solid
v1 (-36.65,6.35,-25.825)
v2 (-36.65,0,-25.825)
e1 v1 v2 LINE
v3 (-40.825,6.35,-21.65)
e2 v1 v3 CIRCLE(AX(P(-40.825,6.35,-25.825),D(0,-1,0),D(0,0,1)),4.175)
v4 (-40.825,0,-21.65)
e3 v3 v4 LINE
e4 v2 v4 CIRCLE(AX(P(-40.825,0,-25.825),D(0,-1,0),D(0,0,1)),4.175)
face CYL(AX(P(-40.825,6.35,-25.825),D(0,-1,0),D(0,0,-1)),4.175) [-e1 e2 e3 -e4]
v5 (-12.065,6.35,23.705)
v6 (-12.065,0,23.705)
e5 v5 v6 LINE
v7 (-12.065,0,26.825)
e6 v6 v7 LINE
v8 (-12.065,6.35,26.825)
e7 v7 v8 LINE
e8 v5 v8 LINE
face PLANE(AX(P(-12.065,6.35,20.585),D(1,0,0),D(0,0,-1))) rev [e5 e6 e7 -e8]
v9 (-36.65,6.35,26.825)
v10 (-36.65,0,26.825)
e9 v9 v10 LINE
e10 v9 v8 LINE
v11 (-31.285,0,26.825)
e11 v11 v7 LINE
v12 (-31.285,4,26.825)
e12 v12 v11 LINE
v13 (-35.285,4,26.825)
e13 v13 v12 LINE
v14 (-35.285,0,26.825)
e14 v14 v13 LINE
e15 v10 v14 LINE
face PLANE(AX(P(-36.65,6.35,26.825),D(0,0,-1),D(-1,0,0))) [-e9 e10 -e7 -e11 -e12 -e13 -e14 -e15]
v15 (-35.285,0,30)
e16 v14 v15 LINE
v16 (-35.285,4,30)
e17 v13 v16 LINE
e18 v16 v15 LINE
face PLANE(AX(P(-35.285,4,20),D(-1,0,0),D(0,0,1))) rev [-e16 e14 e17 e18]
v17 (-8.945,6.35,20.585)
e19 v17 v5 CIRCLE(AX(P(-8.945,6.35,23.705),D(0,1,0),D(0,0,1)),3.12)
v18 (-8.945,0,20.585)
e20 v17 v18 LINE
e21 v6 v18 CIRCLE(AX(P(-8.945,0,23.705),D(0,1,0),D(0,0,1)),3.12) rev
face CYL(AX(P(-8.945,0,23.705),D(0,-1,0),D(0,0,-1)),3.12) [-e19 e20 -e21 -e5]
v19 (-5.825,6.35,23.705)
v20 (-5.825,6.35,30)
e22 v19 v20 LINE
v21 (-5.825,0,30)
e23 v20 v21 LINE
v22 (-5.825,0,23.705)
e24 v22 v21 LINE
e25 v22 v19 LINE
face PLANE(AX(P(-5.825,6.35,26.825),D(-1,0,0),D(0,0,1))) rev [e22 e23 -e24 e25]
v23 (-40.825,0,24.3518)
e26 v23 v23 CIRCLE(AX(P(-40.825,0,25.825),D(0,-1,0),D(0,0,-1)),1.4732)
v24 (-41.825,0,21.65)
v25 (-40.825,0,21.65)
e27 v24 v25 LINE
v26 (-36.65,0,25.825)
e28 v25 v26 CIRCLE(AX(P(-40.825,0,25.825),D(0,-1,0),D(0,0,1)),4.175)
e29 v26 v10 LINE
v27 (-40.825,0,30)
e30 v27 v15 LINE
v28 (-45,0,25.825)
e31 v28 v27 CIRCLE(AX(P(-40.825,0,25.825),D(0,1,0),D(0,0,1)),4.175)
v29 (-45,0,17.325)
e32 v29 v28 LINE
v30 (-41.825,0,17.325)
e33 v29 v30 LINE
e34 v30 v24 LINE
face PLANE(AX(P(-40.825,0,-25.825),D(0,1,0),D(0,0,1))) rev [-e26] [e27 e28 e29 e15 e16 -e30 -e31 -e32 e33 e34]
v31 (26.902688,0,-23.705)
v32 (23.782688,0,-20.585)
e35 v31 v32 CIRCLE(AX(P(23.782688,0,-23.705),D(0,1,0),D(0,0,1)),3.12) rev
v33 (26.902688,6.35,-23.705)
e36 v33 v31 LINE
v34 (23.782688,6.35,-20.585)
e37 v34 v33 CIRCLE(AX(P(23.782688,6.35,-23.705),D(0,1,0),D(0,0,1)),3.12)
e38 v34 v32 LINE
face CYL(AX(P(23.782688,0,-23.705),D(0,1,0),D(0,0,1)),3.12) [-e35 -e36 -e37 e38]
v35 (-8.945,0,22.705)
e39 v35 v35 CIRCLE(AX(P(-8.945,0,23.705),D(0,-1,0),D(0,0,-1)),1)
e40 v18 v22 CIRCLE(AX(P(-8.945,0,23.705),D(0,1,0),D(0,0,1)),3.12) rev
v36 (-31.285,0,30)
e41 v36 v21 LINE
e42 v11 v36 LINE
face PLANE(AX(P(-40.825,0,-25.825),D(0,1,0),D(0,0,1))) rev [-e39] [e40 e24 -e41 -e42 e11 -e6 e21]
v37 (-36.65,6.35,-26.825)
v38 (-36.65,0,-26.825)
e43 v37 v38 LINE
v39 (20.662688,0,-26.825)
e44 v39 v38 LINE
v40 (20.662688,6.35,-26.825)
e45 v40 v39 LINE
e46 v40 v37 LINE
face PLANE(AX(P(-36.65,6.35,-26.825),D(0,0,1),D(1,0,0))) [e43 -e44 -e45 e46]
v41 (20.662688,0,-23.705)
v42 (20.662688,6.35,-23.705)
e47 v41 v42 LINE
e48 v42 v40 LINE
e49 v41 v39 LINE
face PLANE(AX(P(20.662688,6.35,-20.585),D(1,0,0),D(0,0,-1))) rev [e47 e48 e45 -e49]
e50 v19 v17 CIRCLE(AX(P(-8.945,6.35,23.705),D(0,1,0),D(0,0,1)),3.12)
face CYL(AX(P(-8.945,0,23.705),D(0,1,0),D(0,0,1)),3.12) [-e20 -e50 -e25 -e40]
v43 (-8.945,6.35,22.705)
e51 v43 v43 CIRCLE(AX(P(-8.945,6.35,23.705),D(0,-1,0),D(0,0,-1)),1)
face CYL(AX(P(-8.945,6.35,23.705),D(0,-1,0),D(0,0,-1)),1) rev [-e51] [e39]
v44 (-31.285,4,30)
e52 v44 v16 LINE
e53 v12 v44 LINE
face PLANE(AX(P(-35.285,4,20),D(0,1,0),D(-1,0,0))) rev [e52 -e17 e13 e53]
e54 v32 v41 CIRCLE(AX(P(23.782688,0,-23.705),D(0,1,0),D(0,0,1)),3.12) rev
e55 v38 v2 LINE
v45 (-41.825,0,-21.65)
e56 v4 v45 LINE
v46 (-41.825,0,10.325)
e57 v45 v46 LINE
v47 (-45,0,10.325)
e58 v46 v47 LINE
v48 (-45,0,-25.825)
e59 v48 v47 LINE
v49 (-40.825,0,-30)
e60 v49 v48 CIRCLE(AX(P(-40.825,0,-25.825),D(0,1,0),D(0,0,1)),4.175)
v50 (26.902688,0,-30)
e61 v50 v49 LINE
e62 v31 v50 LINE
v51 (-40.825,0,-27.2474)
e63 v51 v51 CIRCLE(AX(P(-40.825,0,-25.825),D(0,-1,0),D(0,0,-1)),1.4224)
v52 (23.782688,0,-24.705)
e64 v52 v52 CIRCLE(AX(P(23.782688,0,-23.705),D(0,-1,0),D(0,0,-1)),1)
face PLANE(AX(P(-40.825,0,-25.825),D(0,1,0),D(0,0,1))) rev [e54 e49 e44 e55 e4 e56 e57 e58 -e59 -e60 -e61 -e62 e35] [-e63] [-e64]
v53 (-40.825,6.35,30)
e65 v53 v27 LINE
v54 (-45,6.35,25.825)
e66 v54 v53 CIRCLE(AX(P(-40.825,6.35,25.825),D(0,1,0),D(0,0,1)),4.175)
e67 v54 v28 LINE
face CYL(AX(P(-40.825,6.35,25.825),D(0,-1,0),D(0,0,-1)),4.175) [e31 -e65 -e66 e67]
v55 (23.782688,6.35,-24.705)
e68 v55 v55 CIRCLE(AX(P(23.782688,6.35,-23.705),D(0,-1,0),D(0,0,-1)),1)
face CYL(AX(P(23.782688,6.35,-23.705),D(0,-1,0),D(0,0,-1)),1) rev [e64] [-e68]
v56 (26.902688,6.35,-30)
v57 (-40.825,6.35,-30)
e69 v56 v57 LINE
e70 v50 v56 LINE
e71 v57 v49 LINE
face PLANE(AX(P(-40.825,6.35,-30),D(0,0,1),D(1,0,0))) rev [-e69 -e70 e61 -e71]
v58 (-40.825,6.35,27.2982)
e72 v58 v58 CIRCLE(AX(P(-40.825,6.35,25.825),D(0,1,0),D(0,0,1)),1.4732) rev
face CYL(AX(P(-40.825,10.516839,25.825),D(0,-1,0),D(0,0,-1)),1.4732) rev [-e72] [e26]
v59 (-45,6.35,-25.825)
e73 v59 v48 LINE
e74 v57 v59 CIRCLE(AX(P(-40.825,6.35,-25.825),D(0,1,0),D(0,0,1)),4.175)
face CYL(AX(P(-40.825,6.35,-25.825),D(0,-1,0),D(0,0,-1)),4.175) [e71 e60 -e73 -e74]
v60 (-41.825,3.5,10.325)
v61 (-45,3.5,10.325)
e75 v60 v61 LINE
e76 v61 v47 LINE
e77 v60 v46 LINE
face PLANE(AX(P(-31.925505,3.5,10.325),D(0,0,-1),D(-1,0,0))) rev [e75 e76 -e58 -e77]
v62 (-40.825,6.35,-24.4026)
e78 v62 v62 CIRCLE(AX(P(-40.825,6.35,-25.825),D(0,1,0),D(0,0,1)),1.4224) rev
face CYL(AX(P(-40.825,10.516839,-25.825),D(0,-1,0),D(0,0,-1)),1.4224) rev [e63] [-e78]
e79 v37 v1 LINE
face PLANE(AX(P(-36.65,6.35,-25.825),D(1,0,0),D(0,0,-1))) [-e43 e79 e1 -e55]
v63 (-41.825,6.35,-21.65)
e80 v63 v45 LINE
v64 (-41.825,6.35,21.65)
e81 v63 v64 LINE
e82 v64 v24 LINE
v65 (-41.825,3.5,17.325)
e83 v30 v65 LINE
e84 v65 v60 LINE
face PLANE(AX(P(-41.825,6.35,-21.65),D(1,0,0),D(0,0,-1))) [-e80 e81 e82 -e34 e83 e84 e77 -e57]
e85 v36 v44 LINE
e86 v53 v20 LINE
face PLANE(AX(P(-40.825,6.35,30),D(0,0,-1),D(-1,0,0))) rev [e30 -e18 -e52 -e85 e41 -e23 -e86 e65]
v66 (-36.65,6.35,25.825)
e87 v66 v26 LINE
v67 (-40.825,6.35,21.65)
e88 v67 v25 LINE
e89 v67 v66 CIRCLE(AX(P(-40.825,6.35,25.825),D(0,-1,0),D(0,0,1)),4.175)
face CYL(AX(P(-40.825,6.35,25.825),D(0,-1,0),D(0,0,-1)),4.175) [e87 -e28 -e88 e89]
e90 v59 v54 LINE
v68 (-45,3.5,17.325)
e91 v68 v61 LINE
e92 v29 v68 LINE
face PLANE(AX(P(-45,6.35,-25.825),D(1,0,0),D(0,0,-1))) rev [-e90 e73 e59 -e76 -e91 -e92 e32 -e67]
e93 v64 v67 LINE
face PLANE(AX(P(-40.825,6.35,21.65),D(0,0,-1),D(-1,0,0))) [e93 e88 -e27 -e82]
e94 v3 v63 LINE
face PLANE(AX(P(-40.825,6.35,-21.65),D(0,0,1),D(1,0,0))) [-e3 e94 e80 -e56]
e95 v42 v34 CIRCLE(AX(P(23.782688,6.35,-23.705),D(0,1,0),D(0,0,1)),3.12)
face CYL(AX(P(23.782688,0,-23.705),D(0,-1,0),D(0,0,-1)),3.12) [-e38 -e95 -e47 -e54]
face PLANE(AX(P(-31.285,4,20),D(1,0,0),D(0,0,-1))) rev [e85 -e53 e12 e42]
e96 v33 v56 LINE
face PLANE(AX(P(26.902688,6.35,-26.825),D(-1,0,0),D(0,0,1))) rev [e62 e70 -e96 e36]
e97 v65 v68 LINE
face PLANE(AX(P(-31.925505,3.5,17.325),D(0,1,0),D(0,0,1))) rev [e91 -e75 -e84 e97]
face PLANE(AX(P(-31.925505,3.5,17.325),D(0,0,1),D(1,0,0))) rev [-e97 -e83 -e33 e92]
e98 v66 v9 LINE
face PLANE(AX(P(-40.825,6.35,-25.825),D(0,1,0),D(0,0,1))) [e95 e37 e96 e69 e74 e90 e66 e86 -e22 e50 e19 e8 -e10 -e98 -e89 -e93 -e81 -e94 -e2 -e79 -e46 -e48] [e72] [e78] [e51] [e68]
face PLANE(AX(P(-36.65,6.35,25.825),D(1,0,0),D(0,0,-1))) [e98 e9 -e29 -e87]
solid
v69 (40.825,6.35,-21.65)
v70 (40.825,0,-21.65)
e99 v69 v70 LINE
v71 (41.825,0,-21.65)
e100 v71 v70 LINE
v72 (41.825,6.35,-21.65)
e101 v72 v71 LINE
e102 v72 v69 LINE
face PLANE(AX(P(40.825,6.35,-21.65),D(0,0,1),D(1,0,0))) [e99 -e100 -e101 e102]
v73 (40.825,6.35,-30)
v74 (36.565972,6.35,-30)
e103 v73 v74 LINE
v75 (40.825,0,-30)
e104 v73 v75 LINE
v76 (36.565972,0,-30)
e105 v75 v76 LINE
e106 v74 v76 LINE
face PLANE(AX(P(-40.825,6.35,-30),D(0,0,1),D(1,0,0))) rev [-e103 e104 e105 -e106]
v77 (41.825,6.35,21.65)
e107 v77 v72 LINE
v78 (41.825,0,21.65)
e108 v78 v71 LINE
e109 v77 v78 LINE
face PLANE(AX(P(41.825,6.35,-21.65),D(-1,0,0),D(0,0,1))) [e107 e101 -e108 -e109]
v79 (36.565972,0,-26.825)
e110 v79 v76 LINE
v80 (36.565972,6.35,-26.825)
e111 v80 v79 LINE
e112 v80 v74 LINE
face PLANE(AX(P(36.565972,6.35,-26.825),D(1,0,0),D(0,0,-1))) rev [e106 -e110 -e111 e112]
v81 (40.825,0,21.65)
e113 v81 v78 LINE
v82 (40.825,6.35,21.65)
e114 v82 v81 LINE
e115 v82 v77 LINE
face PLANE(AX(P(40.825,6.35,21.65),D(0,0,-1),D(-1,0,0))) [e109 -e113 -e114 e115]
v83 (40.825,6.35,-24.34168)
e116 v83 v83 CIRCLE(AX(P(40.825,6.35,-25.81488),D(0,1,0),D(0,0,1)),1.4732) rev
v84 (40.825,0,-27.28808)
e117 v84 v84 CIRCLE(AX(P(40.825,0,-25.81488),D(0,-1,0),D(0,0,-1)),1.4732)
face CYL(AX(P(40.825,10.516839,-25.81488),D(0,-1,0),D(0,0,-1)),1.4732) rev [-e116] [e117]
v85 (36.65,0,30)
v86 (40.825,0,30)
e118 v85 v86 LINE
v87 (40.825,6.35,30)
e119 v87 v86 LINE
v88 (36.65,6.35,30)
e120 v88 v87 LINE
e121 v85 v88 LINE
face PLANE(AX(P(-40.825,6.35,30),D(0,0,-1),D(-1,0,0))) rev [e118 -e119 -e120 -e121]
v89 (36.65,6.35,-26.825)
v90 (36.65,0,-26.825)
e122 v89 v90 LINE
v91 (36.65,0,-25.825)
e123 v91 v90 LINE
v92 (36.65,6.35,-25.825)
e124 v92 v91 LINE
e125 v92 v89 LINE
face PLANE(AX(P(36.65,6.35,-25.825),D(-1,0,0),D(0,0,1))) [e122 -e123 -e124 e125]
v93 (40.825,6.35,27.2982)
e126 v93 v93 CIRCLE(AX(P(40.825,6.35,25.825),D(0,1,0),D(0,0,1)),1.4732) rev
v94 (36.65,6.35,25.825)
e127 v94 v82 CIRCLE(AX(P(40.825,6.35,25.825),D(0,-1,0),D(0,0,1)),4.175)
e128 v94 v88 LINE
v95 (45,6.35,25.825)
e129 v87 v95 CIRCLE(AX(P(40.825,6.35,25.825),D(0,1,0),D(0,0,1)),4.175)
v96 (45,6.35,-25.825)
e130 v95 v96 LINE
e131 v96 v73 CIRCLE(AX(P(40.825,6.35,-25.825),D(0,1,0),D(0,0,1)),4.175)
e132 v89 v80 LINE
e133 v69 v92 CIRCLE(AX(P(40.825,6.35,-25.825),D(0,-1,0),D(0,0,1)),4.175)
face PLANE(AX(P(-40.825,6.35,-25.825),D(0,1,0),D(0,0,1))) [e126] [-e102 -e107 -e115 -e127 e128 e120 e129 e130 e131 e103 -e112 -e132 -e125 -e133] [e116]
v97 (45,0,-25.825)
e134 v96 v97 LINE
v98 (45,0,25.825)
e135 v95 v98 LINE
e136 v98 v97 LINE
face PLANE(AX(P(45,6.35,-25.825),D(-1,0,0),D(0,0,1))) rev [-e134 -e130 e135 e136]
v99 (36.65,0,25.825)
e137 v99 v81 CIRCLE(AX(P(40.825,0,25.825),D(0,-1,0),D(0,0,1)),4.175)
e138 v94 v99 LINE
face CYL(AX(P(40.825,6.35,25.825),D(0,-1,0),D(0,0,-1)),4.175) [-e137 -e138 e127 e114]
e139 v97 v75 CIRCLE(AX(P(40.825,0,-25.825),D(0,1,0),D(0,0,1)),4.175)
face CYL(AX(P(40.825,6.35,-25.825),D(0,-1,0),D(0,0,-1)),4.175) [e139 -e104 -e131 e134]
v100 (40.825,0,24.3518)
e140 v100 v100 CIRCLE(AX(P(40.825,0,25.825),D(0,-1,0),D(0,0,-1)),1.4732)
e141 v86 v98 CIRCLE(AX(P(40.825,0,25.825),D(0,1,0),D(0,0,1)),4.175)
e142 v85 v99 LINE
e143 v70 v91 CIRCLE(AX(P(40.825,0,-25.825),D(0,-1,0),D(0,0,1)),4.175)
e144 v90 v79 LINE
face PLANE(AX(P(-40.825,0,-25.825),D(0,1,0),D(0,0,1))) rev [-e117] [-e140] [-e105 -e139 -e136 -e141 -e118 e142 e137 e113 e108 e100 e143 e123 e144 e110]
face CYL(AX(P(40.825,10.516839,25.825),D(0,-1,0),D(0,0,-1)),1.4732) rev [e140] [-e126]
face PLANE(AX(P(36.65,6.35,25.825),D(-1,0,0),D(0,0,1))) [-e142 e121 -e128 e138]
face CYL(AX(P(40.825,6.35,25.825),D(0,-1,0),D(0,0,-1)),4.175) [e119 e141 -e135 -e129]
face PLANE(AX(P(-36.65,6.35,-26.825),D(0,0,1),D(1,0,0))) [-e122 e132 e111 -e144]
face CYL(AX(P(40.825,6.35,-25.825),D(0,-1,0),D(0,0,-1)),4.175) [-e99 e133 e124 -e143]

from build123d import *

# Parameters (mm, degrees)
BOSS_EXTRUDE3_DEPTH = 6.35
SKETCH3_W           = 9.663283239
SKETCH3_H           = 6.35
CUT_EXTRUDE1_DEPTH  = 3.175
SKETCH4_W           = 42.475
SKETCH4_H           = 6.35
CUT_EXTRUDE2_DEPTH  = 8.35
SKETCH5_W           = 7
SKETCH5_H           = 7
CUT_EXTRUDE3_DEPTH  = 3.175
SKETCH6_R           = 1.4732
CUT_EXTRUDE4_DEPTH  = 6.35
SKETCH7_R           = 1.4224
SKETCH7_R_2         = 1.4732
CUT_EXTRUDE5_DEPTH  = 6.35
SKETCH8_W           = 6.24
SKETCH8_H           = 6.35
BOSS_EXTRUDE4_DEPTH = 6.24
SKETCH9_W           = 6.24
SKETCH9_H           = 6.35
BOSS_EXTRUDE5_DEPTH = 6.24
SKETCH10_R          = 1
CUT_EXTRUDE6_DEPTH  = 55.454774814
FILLET1_R           = 3.12
SKETCH11_W          = 4
SKETCH11_H          = 4
CUT_EXTRUDE7_DEPTH  = 10


with BuildPart() as part:
    # Sketch2 → Boss-Extrude3 (new body)
    with BuildSketch(Plane(origin=(0, 0, 0), x_dir=(1, 0, 0), z_dir=(0, 1, 0))):
        with BuildLine():
            Line((-45, 25.825), (-45, -25.825))
            ThreePointArc((-45, -25.825), (-43.777170811, -28.777170811), (-40.825, -30))
            Line((-40.825, -30), (40.825, -30))
            ThreePointArc((40.825, -30), (43.777170811, -28.777170811), (45, -25.825))
            Line((45, -25.825), (45, 25.825))
            ThreePointArc((45, 25.825), (43.777170811, 28.777170811), (40.825, 30))
            Line((40.825, 30), (-40.825, 30))
            ThreePointArc((-40.825, 30), (-43.777170811, 28.777170811), (-45, 25.825))
        make_face()
        with BuildLine():
            Line((40.825, 21.65), (41.825, 21.65))
            Line((41.825, 21.65), (41.825, -21.65))
            Line((41.825, -21.65), (40.825, -21.65))
            ThreePointArc((40.825, -21.65), (37.872829189, -22.872829189), (36.65, -25.825))
            Line((36.65, -25.825), (36.65, -26.825))
            Line((36.65, -26.825), (-36.65, -26.825))
            Line((-36.65, -26.825), (-36.65, -25.825))
            ThreePointArc((-36.65, -25.825), (-37.872829189, -22.872829189), (-40.825, -21.65))
            Line((-40.825, -21.65), (-41.825, -21.65))
            Line((-41.825, -21.65), (-41.825, 21.65))
            Line((-41.825, 21.65), (-40.825, 21.65))
            ThreePointArc((-40.825, 21.65), (-37.872829189, 22.872829189), (-36.65, 25.825))
            Line((-36.65, 25.825), (-36.65, 26.825))
            Line((-36.65, 26.825), (36.65, 26.825))
            Line((36.65, 26.825), (36.65, 25.825))
            ThreePointArc((36.65, 25.825), (37.872829189, 22.872829189), (40.825, 21.65))
        make_face(mode=Mode.SUBTRACT)
    extrude(amount=BOSS_EXTRUDE3_DEPTH)

    # Sketch3 → Cut-Extrude1 (cut)
    with BuildSketch(Plane(origin=(0, 0, -30), x_dir=(-1, 0, 0), z_dir=(0, 0, -1))):
        with Locations((-31.734329903, 3.175)):
            Rectangle(SKETCH3_W, SKETCH3_H)
    extrude(amount=-CUT_EXTRUDE1_DEPTH, mode=Mode.SUBTRACT)

    # Sketch4 → Cut-Extrude2 (cut)
    with BuildSketch(Plane.XY.offset(30)):
        with Locations((15.4125, 3.175)):
            Rectangle(SKETCH4_W, SKETCH4_H)
    extrude(amount=-CUT_EXTRUDE2_DEPTH, mode=Mode.SUBTRACT)


with BuildPart() as cut_extrude2_piece_1:
    # of the separate pieces the step leaves, piece 1, a body of its own (cut_extrude2_pieces)
    add(part.part.solids().sort_by_distance((-40.825, 0, 30))[0])

    # Sketch5 → Cut-Extrude3 (cut)
    with BuildSketch(Plane.ZY.offset(45)):
        with Locations((13.825, 0)):
            Rectangle(SKETCH5_W, SKETCH5_H)
    extrude(amount=-CUT_EXTRUDE3_DEPTH, mode=Mode.SUBTRACT)

    # Sketch7 → Cut-Extrude5 (cut)
    with BuildSketch(Plane.XZ):
        with Locations(Location((-40.825, -25.825, 0), (0, 0, 270))):
            Circle(SKETCH7_R)
        with Locations(Location((-40.825, 25.825, 0), (0, 0, 270))):
            Circle(SKETCH7_R_2)
    extrude(amount=-CUT_EXTRUDE5_DEPTH, mode=Mode.SUBTRACT)

    # Sketch8 → Boss-Extrude4 (add)
    with BuildSketch(Plane(origin=(0, 0, 26.825), x_dir=(-1, 0, 0), z_dir=(0, 0, -1))):
        with Locations((8.945, 3.175)):
            Rectangle(SKETCH8_W, SKETCH8_H)
    extrude(amount=BOSS_EXTRUDE4_DEPTH)

    # Sketch9 → Boss-Extrude5 (add)
    with BuildSketch(Plane.XY.offset(-26.825)):
        with Locations((23.782688283, 3.175)):
            Rectangle(SKETCH9_W, SKETCH9_H)
    extrude(amount=BOSS_EXTRUDE5_DEPTH)

    # Sketch10 → Cut-Extrude6 (cut, through all)
    with BuildSketch(Plane(origin=(0, 0, 0), x_dir=(-1, 0, 0), z_dir=(0, -1, 0))):
        with Locations(Location((-23.782688283, 23.705, 0), (0, 0, 90))):
            Circle(SKETCH10_R)
        with Locations(Location((8.945, -23.705, 0), (0, 0, 90))):
            Circle(SKETCH10_R)
    extrude(amount=-CUT_EXTRUDE6_DEPTH, mode=Mode.SUBTRACT)

    # Fillet1
    fillet1_edges = [cut_extrude2_piece_1.edges().sort_by_distance(p)[0] for p in [
        (-12.065, 3.175, 20.585),
        (-5.825, 3.175, 20.585),
        (26.902688283, 3.175, -20.585),
        (20.662688283, 3.175, -20.585),
    ]]
    fillet(fillet1_edges, radius=FILLET1_R - 0.0001)  # a hair under: the kernel refuses the full size

    # Sketch11 → Cut-Extrude7 (cut)
    with BuildSketch(Plane.XY.offset(30)):
        with Locations((-33.285, 2)):
            Rectangle(SKETCH11_W, SKETCH11_H)
    extrude(amount=-CUT_EXTRUDE7_DEPTH, mode=Mode.SUBTRACT)


with BuildPart() as cut_extrude2_piece_2:
    # of the separate pieces the step leaves, piece 2, a body of its own (cut_extrude2_pieces)
    add(part.part.solids().sort_by_distance((40.825, 0, -30))[0])

    # Sketch6 → Cut-Extrude4 (cut)
    with BuildSketch(Plane.XZ):
        with Locations(Location((40.825, 25.825, 0), (0, 0, 270))):
            Circle(SKETCH6_R)
        with Locations(Location((40.825, -25.81487963, 0), (0, 0, 270))):
            Circle(SKETCH6_R)
    extrude(amount=-CUT_EXTRUDE4_DEPTH, mode=Mode.SUBTRACT)


solid = Compound([cut_extrude2_piece_1.part, cut_extrude2_piece_2.part])
